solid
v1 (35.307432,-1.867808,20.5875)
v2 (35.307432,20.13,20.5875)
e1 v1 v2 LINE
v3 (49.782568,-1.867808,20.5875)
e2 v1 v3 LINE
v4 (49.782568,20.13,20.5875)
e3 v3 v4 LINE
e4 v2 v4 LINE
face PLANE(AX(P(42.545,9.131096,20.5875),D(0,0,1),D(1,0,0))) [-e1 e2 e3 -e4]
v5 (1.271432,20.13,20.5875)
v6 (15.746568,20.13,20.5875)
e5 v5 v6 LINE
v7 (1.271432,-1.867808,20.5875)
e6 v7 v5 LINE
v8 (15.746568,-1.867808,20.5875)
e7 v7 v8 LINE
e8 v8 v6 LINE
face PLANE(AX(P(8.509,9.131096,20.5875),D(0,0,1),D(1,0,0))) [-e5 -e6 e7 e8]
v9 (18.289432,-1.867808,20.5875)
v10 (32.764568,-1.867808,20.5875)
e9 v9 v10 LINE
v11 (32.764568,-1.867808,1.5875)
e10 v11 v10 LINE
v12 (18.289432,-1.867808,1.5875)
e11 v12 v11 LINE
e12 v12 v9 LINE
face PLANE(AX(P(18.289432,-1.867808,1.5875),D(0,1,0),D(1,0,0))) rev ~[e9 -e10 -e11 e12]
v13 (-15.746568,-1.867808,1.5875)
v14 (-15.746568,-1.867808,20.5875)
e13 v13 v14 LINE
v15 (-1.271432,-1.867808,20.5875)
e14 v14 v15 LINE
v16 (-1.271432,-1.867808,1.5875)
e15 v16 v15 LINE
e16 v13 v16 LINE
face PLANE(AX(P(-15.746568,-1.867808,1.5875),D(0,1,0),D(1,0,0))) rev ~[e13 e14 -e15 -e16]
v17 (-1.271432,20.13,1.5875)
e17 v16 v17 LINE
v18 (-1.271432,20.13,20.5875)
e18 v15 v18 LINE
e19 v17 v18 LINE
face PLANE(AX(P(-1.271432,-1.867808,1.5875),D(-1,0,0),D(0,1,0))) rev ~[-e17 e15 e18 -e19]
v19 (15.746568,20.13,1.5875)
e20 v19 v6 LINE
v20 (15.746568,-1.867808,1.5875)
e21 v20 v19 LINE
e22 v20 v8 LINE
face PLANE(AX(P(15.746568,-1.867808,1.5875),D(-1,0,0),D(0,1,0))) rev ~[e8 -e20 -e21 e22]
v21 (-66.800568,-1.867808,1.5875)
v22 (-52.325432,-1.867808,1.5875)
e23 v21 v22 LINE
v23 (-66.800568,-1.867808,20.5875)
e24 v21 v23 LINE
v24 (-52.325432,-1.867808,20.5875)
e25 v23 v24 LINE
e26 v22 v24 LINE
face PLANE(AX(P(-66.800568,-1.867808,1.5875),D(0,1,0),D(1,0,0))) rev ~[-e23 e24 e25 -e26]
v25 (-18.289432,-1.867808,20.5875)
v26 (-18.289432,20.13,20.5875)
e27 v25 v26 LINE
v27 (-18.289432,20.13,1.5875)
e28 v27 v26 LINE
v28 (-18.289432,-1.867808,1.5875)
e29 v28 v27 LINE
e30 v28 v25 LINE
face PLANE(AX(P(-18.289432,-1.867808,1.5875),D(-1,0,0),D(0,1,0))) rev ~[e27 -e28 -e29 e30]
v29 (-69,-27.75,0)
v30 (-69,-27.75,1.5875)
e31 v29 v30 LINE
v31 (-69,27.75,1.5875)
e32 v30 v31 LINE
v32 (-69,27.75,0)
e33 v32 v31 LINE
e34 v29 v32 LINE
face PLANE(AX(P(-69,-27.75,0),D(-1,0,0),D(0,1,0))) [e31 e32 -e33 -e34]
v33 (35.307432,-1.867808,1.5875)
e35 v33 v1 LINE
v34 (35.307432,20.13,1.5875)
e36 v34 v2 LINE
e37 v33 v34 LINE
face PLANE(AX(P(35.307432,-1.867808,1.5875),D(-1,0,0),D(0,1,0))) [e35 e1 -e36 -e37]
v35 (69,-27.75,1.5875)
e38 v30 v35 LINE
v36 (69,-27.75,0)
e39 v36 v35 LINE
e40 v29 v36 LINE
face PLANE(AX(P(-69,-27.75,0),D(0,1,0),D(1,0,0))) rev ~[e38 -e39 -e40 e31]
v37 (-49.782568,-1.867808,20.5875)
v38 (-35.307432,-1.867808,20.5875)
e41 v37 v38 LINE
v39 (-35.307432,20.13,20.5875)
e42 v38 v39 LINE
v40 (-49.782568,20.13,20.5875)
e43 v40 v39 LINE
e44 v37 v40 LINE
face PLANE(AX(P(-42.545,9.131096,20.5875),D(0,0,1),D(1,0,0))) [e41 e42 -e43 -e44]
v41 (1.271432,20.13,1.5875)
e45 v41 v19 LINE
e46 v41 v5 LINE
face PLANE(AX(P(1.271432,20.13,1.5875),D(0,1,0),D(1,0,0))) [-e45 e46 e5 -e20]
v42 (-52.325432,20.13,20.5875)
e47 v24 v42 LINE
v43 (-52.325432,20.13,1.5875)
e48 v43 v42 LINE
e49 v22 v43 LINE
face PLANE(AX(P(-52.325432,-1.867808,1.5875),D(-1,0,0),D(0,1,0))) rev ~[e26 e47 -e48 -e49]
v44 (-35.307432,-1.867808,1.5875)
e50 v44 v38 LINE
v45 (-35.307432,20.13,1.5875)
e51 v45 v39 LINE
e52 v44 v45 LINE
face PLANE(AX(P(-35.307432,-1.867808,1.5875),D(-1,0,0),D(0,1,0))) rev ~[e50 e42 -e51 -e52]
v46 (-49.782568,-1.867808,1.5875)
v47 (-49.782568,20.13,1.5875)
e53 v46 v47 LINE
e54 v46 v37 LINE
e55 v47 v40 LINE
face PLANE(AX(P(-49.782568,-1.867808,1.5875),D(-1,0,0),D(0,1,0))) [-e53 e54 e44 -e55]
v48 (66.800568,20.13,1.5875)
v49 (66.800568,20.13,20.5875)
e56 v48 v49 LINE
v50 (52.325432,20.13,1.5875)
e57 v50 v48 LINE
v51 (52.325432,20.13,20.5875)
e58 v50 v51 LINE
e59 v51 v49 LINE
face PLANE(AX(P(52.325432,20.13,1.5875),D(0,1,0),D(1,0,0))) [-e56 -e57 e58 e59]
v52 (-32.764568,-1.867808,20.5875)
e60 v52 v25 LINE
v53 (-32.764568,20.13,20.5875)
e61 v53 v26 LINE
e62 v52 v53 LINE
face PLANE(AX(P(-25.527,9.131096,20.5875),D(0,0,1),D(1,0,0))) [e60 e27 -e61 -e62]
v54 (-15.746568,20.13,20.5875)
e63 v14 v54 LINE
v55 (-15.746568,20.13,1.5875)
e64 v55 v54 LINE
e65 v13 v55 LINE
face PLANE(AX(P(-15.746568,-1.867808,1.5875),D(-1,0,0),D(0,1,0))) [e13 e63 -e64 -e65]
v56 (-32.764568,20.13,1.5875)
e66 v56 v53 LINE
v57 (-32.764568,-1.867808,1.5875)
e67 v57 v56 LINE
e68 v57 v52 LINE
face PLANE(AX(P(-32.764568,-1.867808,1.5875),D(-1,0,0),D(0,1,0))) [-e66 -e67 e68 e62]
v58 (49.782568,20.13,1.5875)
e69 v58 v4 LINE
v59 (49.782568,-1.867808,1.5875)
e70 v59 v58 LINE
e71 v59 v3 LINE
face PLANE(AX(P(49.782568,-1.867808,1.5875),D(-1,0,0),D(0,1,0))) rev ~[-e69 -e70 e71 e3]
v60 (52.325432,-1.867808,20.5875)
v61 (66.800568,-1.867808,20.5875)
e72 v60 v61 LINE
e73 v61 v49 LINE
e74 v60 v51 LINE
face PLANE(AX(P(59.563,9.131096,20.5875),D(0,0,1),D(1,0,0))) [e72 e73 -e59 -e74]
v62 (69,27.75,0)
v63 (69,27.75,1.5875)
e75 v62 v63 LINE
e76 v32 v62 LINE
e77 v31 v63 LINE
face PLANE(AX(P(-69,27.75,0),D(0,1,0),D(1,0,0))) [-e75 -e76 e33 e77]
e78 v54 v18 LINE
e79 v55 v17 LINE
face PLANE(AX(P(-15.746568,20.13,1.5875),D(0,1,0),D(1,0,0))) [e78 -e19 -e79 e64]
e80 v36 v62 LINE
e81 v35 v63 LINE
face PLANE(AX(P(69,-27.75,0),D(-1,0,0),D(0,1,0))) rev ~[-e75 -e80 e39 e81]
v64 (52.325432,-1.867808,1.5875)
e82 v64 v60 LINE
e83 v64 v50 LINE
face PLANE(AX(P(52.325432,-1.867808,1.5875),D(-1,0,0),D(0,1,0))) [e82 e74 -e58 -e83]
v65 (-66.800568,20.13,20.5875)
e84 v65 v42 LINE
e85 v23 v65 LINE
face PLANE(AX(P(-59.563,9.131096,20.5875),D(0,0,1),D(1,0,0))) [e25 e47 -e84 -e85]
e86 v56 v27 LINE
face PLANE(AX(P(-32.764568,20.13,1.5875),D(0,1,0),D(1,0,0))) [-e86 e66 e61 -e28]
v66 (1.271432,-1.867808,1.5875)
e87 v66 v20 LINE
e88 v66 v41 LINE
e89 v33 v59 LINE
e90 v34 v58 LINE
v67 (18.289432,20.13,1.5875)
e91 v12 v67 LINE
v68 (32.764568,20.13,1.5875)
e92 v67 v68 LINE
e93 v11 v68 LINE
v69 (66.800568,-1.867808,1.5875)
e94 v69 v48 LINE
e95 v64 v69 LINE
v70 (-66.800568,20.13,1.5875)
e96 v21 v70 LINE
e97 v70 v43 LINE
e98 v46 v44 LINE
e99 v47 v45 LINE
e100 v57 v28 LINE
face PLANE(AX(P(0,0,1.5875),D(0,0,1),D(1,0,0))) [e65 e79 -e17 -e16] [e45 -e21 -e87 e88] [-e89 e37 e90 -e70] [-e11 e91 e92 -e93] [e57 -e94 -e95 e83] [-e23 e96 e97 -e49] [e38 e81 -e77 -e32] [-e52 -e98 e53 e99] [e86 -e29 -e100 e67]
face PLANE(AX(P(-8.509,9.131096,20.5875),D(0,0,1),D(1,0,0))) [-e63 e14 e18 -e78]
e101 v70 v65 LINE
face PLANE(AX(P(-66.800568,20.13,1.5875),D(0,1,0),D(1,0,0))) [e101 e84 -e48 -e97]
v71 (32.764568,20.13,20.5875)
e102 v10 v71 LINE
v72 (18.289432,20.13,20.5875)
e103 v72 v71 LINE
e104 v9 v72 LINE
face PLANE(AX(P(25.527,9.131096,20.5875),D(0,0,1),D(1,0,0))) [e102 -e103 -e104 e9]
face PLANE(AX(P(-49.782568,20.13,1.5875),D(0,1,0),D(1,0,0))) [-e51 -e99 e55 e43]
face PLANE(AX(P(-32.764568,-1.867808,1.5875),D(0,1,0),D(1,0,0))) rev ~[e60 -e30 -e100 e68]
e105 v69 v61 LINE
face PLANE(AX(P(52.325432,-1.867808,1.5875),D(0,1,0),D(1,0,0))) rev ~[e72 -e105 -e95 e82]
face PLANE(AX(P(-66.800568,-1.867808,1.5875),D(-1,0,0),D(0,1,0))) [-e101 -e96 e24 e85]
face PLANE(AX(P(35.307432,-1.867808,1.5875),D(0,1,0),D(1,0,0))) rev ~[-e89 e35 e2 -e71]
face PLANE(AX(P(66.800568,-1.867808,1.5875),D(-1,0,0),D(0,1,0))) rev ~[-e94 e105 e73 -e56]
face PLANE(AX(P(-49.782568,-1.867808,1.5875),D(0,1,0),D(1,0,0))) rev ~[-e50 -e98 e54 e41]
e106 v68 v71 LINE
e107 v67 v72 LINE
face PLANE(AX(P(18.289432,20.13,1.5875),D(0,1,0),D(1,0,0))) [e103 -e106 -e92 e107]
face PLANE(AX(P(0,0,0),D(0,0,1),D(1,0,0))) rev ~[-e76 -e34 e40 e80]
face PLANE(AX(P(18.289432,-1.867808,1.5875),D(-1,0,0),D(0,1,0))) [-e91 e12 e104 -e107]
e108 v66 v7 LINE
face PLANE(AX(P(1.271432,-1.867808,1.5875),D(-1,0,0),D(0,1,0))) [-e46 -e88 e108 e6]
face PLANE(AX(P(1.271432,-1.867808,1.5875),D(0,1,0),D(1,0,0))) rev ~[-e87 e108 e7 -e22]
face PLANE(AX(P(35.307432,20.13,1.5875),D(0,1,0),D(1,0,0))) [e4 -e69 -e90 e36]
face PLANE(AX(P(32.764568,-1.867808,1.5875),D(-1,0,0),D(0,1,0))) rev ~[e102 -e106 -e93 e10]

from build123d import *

# Parameters (mm, degrees)
F0_W     = 138
F0_H     = 55.5
F1_DEPTH = 1.5875
F2_W     = 14.4751365056
F2_H     = 21.9978075475
F3_DEPTH = 19


# Not quite as in the source:
# - a feature names something its author has since deleted; it is built from what else it names


with BuildPart() as f1:
    # F0 (on Top) → F1 (new body)
    with BuildSketch(Plane.XY):
        Rectangle(F0_W, F0_H)
    extrude(amount=F1_DEPTH)

    # F2 (on face) → F3 (join)
    with BuildSketch(Plane.XY.offset(1.5875)):
        with Locations((-25.527, 9.1310962263)):
            Rectangle(F2_W, F2_H)
        with Locations((-8.509, 9.1310962263)):
            Rectangle(F2_W, F2_H)
        with Locations((8.509, 9.1310962263)):
            Rectangle(F2_W, F2_H)
        with Locations((25.527, 9.1310962263)):
            Rectangle(F2_W, F2_H)
        with Locations((42.545, 9.1310962263)):
            Rectangle(F2_W, F2_H)
        with Locations((59.563, 9.1310962263)):
            Rectangle(F2_W, F2_H)
        with Locations((-42.545, 9.1310962263)):
            Rectangle(F2_W, F2_H)
        with Locations((-59.563, 9.1310962263)):
            Rectangle(F2_W, F2_H)
    extrude(amount=F3_DEPTH)


solid = f1.part
